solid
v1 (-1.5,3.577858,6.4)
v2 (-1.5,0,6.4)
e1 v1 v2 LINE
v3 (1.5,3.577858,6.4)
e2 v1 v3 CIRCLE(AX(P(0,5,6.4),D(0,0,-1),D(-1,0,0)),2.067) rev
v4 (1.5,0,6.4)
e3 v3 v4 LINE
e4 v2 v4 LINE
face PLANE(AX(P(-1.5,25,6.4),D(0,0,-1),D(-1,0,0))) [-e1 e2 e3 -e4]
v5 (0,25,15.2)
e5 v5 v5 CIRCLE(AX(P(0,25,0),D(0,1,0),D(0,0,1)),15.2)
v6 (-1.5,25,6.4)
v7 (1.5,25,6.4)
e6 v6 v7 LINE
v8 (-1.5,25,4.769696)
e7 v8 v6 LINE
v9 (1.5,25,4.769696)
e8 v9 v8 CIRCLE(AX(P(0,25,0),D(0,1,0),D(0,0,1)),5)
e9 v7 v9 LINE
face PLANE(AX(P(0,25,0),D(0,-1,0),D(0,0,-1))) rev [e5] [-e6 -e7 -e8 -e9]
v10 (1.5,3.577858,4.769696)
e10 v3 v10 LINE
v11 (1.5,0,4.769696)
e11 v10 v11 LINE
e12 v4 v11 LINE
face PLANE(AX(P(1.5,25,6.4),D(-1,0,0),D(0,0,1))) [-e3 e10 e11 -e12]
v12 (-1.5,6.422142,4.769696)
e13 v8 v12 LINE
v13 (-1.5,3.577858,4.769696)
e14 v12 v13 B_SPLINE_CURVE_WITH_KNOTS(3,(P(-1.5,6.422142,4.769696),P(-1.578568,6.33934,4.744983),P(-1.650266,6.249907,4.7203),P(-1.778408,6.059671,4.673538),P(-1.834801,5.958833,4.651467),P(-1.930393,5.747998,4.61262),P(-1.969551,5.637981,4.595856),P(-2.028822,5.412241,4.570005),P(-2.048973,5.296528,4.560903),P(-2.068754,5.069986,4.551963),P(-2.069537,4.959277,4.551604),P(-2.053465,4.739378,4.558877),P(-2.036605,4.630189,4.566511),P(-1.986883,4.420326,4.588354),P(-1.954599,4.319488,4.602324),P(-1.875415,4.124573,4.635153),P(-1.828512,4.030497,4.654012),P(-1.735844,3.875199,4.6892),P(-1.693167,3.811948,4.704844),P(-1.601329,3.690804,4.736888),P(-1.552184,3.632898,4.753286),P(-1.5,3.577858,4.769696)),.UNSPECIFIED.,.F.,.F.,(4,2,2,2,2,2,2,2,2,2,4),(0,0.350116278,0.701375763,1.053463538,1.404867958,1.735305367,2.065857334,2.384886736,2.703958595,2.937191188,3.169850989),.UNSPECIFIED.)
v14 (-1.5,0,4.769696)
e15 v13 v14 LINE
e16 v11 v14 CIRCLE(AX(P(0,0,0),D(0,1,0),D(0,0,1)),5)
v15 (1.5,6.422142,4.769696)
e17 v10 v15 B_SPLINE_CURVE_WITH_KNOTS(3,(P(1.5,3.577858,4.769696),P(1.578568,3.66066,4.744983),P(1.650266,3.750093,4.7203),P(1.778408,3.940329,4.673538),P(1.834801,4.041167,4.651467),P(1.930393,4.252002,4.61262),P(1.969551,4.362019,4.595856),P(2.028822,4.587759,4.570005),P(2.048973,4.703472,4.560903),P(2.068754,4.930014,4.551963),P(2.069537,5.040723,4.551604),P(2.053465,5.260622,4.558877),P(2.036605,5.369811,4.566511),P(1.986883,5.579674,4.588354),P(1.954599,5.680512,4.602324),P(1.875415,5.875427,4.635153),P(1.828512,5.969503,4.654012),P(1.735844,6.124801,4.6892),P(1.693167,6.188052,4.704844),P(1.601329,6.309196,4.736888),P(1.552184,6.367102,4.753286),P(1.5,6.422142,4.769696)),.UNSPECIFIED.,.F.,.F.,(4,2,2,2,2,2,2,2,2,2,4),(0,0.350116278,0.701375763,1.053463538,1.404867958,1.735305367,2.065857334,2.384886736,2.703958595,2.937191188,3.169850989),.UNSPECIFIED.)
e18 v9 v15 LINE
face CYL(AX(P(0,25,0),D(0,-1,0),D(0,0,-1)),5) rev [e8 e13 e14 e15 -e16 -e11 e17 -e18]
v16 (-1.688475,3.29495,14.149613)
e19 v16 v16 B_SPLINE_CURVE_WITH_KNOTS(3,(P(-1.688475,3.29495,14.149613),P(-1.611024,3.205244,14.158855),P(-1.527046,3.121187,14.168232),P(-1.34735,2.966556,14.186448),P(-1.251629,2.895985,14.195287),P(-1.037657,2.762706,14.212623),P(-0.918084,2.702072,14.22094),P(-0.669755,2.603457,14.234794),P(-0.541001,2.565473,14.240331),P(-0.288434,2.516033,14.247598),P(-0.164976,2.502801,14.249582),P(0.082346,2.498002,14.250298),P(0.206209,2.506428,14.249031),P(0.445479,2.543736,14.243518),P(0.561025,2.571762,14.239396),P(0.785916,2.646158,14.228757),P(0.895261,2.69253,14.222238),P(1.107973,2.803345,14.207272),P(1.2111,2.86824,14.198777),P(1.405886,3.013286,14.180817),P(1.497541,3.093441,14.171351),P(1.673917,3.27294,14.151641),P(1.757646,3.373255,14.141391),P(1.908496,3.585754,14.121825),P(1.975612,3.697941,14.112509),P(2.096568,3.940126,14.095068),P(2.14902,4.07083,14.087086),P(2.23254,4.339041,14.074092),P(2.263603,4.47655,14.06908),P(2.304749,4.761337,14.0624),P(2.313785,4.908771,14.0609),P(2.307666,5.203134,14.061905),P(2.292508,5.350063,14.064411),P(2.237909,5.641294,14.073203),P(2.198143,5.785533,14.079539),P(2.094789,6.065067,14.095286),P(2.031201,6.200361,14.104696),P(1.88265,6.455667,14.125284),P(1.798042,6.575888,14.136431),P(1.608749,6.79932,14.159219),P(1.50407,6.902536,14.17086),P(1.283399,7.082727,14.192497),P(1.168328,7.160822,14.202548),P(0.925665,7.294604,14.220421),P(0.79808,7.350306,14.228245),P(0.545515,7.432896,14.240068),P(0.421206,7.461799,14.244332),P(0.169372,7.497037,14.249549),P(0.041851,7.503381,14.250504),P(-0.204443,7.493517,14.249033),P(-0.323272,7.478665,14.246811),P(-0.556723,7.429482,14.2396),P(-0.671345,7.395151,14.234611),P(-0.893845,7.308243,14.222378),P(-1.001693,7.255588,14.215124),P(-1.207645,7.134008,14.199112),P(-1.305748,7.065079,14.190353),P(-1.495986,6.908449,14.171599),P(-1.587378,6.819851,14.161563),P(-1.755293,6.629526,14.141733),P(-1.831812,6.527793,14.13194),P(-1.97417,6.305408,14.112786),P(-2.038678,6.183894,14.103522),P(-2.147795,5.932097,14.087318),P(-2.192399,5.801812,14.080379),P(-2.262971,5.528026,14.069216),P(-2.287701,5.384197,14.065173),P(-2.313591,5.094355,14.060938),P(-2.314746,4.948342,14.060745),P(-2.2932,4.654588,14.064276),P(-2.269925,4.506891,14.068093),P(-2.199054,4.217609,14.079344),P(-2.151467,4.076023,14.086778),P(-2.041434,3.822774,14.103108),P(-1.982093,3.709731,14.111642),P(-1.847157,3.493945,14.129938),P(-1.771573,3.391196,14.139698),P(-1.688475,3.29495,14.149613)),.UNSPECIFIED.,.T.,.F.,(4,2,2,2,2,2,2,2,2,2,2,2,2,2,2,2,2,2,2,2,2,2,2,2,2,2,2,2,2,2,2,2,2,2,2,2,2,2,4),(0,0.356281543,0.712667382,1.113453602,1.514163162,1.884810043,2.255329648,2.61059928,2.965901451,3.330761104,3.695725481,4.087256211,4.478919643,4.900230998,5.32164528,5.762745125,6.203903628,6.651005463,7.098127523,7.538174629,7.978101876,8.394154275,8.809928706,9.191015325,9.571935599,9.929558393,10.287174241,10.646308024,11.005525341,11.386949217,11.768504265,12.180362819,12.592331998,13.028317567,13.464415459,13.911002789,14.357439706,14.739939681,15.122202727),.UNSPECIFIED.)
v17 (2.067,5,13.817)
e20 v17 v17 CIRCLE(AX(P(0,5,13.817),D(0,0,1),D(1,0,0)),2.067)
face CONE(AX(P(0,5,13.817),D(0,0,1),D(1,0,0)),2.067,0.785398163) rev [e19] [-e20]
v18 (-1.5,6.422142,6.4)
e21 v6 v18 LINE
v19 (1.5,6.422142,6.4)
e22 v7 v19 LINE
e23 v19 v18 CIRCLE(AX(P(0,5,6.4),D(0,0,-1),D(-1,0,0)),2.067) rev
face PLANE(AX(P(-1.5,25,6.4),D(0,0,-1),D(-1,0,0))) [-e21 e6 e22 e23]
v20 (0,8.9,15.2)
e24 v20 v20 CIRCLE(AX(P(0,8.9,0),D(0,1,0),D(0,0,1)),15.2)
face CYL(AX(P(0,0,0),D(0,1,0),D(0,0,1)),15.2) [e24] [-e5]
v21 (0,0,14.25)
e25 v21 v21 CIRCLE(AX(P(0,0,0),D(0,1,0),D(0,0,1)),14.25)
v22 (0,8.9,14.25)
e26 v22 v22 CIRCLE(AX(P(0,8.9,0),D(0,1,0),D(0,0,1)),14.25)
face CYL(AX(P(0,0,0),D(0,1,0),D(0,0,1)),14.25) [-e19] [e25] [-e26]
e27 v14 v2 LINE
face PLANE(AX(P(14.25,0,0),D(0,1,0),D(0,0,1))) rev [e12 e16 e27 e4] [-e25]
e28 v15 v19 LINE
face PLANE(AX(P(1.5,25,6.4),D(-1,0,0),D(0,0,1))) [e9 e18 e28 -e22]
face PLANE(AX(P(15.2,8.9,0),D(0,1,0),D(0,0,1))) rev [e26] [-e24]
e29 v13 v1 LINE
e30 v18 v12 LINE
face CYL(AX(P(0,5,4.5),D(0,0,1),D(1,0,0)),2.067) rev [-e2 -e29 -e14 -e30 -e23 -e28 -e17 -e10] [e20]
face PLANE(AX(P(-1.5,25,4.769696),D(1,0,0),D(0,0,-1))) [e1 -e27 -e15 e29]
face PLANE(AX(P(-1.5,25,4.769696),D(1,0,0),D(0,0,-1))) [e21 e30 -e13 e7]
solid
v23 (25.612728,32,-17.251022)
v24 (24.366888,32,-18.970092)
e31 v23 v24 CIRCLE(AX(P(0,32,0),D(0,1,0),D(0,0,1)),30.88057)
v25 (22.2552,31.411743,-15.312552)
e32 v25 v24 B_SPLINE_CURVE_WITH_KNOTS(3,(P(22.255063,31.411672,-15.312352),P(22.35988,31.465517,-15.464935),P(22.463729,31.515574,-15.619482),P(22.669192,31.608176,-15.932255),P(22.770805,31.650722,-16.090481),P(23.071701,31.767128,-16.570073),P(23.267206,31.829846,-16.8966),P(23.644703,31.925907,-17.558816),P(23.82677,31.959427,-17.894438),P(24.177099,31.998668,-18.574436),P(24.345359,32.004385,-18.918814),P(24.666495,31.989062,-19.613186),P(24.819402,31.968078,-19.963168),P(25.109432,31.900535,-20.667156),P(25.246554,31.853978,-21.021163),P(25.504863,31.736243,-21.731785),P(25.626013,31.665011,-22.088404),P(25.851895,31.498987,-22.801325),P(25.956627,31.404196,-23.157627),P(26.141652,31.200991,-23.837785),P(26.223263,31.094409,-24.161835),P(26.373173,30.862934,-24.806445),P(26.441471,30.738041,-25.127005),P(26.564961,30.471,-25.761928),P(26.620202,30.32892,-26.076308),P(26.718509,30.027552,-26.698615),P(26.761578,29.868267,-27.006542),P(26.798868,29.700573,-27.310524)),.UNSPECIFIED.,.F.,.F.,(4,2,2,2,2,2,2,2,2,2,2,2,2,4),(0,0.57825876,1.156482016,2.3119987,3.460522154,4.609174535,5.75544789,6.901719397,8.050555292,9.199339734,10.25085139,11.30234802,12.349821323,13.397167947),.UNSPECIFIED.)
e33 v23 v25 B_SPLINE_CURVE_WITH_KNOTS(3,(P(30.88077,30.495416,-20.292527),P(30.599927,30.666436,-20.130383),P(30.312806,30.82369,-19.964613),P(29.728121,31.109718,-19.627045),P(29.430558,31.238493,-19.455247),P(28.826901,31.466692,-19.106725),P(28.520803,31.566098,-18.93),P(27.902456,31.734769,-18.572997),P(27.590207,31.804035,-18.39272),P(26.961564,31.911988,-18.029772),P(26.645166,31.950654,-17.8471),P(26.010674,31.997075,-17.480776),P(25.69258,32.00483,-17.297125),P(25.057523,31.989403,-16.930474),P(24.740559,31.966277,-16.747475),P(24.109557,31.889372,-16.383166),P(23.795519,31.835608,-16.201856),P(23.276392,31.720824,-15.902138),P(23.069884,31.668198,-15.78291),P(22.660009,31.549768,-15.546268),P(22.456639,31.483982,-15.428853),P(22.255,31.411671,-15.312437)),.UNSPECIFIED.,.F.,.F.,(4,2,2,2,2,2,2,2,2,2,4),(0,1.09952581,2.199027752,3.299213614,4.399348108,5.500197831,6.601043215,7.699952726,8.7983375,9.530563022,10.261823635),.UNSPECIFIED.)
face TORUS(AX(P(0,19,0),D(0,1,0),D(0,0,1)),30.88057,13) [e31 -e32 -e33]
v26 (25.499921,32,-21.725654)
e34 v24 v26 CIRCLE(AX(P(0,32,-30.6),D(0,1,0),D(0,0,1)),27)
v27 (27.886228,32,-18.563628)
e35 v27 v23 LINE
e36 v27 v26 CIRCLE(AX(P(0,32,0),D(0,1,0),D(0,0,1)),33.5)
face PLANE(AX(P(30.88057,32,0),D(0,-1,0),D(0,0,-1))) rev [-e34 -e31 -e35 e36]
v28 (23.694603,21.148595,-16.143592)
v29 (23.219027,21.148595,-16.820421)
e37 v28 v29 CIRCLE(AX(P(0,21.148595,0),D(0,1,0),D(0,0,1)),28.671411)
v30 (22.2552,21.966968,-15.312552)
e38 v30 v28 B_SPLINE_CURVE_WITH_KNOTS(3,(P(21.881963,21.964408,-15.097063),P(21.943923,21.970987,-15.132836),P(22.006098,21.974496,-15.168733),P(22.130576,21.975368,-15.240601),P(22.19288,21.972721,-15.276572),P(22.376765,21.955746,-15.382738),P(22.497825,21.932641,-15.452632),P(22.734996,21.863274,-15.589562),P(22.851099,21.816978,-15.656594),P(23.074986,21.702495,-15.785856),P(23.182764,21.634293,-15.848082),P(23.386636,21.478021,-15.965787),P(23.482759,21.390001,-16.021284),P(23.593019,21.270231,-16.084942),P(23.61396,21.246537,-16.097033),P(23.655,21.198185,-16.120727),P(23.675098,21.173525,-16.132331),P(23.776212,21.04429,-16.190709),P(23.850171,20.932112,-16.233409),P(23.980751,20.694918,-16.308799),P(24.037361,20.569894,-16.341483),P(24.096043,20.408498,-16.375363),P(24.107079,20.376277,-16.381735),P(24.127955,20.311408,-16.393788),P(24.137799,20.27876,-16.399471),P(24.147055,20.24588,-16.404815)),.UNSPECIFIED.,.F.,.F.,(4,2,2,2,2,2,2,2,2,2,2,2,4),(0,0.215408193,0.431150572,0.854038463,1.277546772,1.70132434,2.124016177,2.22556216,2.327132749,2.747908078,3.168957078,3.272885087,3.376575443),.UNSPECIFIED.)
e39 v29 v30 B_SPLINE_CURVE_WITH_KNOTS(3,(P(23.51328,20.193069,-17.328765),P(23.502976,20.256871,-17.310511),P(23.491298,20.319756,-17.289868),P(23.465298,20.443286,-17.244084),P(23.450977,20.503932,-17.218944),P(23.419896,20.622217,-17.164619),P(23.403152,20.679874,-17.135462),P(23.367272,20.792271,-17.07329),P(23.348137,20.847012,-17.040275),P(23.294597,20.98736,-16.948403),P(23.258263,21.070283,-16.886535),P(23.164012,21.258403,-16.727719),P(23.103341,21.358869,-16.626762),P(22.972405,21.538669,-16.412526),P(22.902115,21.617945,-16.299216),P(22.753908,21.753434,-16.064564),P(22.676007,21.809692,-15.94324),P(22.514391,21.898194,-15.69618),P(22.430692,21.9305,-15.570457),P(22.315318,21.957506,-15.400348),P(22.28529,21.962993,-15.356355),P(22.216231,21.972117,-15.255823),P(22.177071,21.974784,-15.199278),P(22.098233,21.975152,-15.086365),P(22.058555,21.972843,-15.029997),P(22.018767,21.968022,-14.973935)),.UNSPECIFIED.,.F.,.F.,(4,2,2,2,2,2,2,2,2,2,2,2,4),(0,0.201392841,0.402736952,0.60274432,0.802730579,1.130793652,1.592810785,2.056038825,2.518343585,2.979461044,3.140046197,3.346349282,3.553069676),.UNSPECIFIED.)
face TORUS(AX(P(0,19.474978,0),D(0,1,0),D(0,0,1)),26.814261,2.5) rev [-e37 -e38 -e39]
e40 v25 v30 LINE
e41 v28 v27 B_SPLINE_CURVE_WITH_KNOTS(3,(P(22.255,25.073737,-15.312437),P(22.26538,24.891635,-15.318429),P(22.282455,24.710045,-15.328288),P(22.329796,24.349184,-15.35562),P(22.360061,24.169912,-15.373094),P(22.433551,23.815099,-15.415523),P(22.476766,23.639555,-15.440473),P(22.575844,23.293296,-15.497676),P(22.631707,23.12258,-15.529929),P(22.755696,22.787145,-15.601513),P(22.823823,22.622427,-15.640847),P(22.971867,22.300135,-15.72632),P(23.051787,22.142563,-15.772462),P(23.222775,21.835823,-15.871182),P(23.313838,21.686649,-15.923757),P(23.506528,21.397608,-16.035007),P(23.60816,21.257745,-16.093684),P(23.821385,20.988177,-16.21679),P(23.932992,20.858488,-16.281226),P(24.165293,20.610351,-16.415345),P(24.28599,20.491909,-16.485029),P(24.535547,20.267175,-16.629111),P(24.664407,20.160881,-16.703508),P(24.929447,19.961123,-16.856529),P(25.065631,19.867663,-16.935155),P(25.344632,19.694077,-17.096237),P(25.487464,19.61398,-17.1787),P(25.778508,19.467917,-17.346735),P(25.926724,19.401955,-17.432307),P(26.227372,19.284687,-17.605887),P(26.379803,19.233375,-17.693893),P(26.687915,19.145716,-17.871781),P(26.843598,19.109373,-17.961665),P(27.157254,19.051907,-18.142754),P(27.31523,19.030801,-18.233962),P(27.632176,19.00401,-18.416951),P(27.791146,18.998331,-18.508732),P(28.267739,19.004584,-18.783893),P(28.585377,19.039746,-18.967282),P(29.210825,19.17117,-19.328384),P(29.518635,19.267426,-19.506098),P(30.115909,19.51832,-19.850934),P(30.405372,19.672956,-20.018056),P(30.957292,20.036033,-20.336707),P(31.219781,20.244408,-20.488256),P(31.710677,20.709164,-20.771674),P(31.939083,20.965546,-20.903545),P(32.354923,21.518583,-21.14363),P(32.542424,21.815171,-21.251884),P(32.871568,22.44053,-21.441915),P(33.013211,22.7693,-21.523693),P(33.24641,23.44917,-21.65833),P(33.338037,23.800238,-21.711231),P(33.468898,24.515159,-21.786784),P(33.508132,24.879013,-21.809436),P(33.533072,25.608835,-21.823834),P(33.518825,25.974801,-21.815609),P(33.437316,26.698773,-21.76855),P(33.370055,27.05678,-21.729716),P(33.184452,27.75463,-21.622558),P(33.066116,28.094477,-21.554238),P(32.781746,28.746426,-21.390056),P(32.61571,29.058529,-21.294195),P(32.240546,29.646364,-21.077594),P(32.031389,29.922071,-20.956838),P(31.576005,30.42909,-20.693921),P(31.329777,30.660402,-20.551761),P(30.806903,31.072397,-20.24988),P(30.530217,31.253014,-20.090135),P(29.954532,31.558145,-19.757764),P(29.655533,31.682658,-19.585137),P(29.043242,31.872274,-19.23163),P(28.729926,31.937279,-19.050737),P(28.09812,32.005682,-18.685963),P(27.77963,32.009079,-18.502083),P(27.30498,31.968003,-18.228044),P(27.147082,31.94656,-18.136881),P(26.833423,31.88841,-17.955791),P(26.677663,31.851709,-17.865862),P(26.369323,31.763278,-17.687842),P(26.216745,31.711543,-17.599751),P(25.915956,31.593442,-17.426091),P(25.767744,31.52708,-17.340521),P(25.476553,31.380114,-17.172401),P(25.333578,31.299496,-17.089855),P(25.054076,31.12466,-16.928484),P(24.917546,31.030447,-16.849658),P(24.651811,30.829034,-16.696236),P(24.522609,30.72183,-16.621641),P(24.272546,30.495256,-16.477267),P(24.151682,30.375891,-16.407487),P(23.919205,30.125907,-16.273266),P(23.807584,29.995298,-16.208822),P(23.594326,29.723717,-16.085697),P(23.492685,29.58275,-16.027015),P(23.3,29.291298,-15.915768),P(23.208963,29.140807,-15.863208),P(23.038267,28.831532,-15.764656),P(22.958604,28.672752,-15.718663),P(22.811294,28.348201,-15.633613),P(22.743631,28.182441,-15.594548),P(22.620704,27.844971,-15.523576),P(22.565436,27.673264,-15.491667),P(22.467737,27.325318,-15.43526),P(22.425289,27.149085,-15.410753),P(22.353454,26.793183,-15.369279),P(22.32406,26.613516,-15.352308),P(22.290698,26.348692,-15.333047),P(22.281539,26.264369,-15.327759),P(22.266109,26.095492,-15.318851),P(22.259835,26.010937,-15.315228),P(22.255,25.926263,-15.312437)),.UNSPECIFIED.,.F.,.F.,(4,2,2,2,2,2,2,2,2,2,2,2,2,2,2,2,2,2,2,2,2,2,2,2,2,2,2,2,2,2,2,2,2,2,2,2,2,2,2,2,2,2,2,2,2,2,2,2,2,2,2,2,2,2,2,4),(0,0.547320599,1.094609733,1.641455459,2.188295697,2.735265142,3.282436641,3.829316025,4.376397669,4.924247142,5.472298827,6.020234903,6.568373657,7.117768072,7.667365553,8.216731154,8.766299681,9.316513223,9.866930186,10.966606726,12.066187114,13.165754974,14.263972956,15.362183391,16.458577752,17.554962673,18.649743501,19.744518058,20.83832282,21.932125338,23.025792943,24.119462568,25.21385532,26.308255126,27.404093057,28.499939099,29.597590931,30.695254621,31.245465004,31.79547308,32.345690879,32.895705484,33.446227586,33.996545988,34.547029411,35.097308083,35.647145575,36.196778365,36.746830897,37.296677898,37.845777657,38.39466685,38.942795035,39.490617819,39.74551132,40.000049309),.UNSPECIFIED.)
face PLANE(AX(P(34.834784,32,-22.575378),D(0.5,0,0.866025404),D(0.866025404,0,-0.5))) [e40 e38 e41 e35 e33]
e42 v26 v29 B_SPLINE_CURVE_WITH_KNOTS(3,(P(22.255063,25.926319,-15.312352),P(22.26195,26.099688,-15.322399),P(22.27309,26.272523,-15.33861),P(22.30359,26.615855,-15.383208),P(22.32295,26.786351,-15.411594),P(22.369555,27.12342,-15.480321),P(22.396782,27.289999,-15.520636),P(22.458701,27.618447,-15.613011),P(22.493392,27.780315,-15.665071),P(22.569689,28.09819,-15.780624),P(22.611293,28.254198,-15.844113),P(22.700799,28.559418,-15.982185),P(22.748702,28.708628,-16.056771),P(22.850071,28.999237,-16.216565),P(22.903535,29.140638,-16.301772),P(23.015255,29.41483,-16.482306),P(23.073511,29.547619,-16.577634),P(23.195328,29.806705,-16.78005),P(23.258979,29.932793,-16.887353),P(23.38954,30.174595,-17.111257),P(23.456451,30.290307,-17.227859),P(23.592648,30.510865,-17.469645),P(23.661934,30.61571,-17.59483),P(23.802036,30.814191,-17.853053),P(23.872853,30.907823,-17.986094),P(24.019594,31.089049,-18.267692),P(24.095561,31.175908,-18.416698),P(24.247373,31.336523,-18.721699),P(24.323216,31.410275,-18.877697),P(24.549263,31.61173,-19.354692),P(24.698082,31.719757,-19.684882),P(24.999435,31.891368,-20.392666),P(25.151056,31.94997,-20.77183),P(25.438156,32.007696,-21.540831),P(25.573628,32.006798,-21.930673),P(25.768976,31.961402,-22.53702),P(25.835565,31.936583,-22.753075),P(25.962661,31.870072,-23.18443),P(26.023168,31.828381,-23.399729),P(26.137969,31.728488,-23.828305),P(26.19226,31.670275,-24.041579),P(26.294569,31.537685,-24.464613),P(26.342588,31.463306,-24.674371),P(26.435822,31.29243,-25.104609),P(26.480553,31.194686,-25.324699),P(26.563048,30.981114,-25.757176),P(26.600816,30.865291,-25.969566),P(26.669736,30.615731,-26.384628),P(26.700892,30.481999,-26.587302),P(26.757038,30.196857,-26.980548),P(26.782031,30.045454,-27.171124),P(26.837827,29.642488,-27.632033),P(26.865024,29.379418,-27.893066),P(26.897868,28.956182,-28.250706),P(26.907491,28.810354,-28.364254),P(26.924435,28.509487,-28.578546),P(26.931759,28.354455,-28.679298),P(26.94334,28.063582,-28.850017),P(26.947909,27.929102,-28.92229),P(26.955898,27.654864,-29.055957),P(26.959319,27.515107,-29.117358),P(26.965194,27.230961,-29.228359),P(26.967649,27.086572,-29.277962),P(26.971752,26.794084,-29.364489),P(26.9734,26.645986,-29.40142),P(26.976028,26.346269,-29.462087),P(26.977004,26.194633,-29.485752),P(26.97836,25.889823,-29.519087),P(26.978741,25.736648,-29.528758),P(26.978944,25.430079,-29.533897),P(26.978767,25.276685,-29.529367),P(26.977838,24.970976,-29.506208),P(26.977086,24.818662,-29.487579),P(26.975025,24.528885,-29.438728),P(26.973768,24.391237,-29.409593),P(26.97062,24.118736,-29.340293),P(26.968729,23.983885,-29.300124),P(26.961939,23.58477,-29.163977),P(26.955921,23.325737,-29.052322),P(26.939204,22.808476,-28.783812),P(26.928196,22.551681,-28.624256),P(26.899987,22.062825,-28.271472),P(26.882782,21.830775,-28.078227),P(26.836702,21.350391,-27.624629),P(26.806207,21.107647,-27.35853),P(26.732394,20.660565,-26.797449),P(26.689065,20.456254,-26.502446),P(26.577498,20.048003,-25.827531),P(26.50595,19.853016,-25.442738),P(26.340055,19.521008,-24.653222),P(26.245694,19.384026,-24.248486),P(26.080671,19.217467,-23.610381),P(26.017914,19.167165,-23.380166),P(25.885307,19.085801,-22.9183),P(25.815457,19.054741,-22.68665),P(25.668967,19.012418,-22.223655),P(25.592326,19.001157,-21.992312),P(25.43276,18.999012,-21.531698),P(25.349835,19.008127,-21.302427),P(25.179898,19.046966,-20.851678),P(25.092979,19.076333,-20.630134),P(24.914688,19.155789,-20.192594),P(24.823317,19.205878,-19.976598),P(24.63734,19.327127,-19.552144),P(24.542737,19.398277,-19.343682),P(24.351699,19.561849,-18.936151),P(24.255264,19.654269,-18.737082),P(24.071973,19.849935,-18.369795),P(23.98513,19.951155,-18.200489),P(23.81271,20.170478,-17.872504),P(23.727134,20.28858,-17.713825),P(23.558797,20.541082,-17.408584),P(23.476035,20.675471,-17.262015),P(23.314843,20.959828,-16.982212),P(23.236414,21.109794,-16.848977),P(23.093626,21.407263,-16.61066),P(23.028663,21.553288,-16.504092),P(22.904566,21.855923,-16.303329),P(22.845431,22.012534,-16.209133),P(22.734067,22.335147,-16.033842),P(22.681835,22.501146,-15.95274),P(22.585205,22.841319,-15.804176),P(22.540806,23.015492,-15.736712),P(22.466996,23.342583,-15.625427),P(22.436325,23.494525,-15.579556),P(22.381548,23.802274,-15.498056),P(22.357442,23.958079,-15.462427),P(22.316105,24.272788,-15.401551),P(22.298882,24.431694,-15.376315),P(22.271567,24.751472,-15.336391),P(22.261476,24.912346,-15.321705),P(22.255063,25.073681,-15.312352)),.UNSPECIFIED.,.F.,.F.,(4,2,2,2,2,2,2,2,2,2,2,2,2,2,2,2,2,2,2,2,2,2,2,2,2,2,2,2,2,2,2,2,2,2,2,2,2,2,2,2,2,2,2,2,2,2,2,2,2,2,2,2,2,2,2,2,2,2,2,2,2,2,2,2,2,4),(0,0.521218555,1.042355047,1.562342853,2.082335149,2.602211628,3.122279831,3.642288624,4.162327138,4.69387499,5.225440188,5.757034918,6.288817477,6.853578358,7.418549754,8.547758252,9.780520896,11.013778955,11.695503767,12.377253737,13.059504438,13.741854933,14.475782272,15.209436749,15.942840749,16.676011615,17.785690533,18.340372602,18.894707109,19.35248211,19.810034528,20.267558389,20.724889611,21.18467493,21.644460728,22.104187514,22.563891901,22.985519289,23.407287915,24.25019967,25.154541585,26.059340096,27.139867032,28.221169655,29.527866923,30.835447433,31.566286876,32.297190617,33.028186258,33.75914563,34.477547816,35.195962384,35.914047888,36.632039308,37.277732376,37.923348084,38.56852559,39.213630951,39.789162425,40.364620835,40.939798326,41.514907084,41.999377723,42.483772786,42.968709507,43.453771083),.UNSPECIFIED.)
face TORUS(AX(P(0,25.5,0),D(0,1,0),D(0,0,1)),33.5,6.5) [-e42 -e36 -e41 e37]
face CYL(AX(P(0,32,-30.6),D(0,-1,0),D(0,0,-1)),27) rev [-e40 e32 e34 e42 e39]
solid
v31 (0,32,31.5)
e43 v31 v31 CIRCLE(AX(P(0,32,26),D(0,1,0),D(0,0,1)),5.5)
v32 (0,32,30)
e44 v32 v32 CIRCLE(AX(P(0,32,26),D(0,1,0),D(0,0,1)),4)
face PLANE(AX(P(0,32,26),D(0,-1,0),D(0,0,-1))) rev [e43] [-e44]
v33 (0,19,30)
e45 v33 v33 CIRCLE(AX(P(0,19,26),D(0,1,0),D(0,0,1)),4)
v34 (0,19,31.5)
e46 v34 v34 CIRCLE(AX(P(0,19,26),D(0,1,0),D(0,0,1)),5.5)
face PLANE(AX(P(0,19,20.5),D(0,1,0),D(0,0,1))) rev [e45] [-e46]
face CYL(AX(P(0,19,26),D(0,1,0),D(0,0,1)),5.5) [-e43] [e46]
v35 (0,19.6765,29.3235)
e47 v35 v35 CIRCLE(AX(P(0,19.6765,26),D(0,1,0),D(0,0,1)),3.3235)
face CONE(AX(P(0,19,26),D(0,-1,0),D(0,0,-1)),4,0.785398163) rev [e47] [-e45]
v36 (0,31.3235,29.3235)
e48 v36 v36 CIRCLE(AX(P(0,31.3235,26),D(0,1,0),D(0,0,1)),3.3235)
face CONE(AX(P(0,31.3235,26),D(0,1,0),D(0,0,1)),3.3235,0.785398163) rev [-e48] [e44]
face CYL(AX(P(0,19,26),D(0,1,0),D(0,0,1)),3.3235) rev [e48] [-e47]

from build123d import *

# Parameters (mm, degrees)
CUT_EXTRUDE_1_DEPTH    = 32
PATTERN_START          = 2
PATTERN_LINEAR_1_DEPTH = 30
SKETCH_5_W             = 5.5
SKETCH_5_H             = 13
CUT_EXTRUDE_2_DEPTH    = 25


# Read off the part's stored shape, not the designer's step: 阵列(线性)1
with BuildPart() as part:
    # 草图1 → 旋转1 (revolve)
    with BuildSketch(Plane.XY, mode=Mode.PRIVATE) as revolve_1_sk:
        with BuildLine():
            Line((0, 20), (5, 20))
            Line((5, 20), (5, 16.939442451))
            Line((5, 16.939442451), (23.498601429, 29.700772791))
            ThreePointArc((23.498601429, 29.700772791), (27.014696752, 31.411890394), (30.880570115, 32))
            Line((30.880570115, 32), (33.5, 32))
            ThreePointArc((33.5, 32), (39.438608051, 22.857475748), (28.671410524, 21.148595207))
            ThreePointArc((28.671410524, 21.148595207), (27.10540909, 21.957966627), (25.394651363, 21.5328189))
            Line((25.394651363, 21.5328189), (5, 7.463491323))
            Line((5, 7.463491323), (5, 2))
            Line((5, 2), (0, 2))
            Line((0, 2), (0, 20))
        make_face()
    revolve(revolve_1_sk.sketch.rotate(Axis((0, 0, 0), (0, 1, 0)), 270), axis=Axis((0, 0, 0), (0, 1, 0)))

    # 草图2 → 切除-拉伸1 (cut)
    with BuildSketch(Plane(origin=(0, 0, 0), x_dir=(1, 0, 0), z_dir=(0, 1, 0))):
        with BuildLine():
            Line((26.001324465, 7.275378072), (10.010517998, -1.956918346))
            ThreePointArc((10.010517998, -1.956918346), (8.833459119, -5.1), (6.7, -7.690903718))
            Line((6.7, -7.690903718), (6.7, -26.155496554))
            ThreePointArc((6.7, -26.155496554), (23.382685902, -13.5), (26.001324465, 7.275378072))
        make_face()
    extrude(amount=CUT_EXTRUDE_1_DEPTH, mode=Mode.SUBTRACT)

    # 阵列(线性)1 outline → 阵列(线性)1 (cut)
    with BuildSketch(Plane(origin=(0, 0, 0), x_dir=(1, 0, 0), z_dir=(0, 1, 0)).offset(PATTERN_START)):
        with BuildLine():
            Line((33.524972429, 21.819158249), (22.255200364, 15.312552314))
            ThreePointArc((22.255200364, 15.312552314), (25.62325476, 22.088313006), (26.978891649, 29.532570659))
            Line((26.978891649, 29.532570659), (27.472169879, 42))
            Line((27.472169879, 42), (-42, 42))
            Line((-42, 42), (-42, -42))
            Line((-42, -42), (42, -42))
            Line((42, -42), (42, 26.712217698))
            Line((42, 26.712217698), (33.524972429, 21.819158249))
        make_face()
        with BuildLine():
            Line((10.010517998, -1.956918346), (26.001324465, 7.275378072))
            ThreePointArc((26.001324465, 7.275378072), (23.382685902, -13.5), (6.7, -26.155496554))
            Line((6.7, -26.155496554), (6.7, -7.690903718))
            ThreePointArc((6.7, -7.690903718), (8.833459119, -5.1), (10.010517998, -1.956918346))
        make_face(mode=Mode.SUBTRACT)
    extrude(amount=PATTERN_LINEAR_1_DEPTH, mode=Mode.SUBTRACT)


with BuildPart() as body_2:
    # 草图4 → 旋转2 (revolve)
    with BuildSketch(Plane.XY, mode=Mode.PRIVATE) as revolve_2_sk:
        Polygon((0, 25), (15.2, 25), (15.2, 8.9), (14.25, 8.9), (14.25, 0), (0, 0), align=None)
    revolve(revolve_2_sk.sketch.rotate(Axis((0, 0, 0), (0, 1, 0)), 270), axis=Axis((0, 0, 0), (0, 1, 0)))

    # 草图7 → 切除-拉伸2 (cut)
    with BuildSketch(Plane(origin=(0, 0, 0), x_dir=(1, 0, 0), z_dir=(0, 1, 0))):
        with BuildLine():
            Line((-1.5, -4.769696007), (-1.5, -6.4))
            Line((-1.5, -6.4), (1.5, -6.4))
            Line((1.5, -6.4), (1.5, -4.769696007))
            ThreePointArc((1.5, -4.769696007), (0, 5), (-1.5, -4.769696007))
        make_face()
    extrude(amount=CUT_EXTRUDE_2_DEPTH, mode=Mode.SUBTRACT)

    # 草图8 → 切除-旋转2 (revolve, cut)
    with BuildSketch(Plane(origin=(0, 0, 0), x_dir=(0, 0, -1), z_dir=(1, 0, 0)), mode=Mode.PRIVATE) as cut_revolve_2_sk:
        Polygon((-14.25, 5), (-14.25, 7.5), (-13.817, 7.067), (-4.5, 7.067), (-4.5, 5), align=None)
    revolve(cut_revolve_2_sk.sketch.rotate(Axis((0, 5, 4.5), (0, 0, 1)), 270), axis=Axis((0, 5, 4.5), (0, 0, 1)), mode=Mode.SUBTRACT)


with BuildPart() as body_3:
    # 草图5 → 旋转3 (revolve)
    with BuildSketch(Plane(origin=(0, 0, 0), x_dir=(0, 0, -1), z_dir=(1, 0, 0)), mode=Mode.PRIVATE) as revolve_3_sk:
        with Locations((-23.25, 25.5)):
            Rectangle(SKETCH_5_W, SKETCH_5_H)
    revolve(revolve_3_sk.sketch.rotate(Axis((0, 19, 26), (0, 1, 0)), 180), axis=Axis((0, 19, 26), (0, 1, 0)))

    # 草图6 → 切除-旋转1 (revolve, cut)
    with BuildSketch(Plane(origin=(0, 0, 0), x_dir=(0, 0, -1), z_dir=(1, 0, 0)), mode=Mode.PRIVATE) as cut_revolve_1_sk:
        Polygon((-26, 32), (-22, 32), (-22.6765, 31.3235), (-22.6765, 19.6765), (-22, 19), (-26, 19), align=None)
    revolve(cut_revolve_1_sk.sketch.rotate(Axis((0, 19, 26), (0, 1, 0)), 180), axis=Axis((0, 19, 26), (0, 1, 0)), mode=Mode.SUBTRACT)


solid = Compound([part.part, body_2.part, body_3.part])
